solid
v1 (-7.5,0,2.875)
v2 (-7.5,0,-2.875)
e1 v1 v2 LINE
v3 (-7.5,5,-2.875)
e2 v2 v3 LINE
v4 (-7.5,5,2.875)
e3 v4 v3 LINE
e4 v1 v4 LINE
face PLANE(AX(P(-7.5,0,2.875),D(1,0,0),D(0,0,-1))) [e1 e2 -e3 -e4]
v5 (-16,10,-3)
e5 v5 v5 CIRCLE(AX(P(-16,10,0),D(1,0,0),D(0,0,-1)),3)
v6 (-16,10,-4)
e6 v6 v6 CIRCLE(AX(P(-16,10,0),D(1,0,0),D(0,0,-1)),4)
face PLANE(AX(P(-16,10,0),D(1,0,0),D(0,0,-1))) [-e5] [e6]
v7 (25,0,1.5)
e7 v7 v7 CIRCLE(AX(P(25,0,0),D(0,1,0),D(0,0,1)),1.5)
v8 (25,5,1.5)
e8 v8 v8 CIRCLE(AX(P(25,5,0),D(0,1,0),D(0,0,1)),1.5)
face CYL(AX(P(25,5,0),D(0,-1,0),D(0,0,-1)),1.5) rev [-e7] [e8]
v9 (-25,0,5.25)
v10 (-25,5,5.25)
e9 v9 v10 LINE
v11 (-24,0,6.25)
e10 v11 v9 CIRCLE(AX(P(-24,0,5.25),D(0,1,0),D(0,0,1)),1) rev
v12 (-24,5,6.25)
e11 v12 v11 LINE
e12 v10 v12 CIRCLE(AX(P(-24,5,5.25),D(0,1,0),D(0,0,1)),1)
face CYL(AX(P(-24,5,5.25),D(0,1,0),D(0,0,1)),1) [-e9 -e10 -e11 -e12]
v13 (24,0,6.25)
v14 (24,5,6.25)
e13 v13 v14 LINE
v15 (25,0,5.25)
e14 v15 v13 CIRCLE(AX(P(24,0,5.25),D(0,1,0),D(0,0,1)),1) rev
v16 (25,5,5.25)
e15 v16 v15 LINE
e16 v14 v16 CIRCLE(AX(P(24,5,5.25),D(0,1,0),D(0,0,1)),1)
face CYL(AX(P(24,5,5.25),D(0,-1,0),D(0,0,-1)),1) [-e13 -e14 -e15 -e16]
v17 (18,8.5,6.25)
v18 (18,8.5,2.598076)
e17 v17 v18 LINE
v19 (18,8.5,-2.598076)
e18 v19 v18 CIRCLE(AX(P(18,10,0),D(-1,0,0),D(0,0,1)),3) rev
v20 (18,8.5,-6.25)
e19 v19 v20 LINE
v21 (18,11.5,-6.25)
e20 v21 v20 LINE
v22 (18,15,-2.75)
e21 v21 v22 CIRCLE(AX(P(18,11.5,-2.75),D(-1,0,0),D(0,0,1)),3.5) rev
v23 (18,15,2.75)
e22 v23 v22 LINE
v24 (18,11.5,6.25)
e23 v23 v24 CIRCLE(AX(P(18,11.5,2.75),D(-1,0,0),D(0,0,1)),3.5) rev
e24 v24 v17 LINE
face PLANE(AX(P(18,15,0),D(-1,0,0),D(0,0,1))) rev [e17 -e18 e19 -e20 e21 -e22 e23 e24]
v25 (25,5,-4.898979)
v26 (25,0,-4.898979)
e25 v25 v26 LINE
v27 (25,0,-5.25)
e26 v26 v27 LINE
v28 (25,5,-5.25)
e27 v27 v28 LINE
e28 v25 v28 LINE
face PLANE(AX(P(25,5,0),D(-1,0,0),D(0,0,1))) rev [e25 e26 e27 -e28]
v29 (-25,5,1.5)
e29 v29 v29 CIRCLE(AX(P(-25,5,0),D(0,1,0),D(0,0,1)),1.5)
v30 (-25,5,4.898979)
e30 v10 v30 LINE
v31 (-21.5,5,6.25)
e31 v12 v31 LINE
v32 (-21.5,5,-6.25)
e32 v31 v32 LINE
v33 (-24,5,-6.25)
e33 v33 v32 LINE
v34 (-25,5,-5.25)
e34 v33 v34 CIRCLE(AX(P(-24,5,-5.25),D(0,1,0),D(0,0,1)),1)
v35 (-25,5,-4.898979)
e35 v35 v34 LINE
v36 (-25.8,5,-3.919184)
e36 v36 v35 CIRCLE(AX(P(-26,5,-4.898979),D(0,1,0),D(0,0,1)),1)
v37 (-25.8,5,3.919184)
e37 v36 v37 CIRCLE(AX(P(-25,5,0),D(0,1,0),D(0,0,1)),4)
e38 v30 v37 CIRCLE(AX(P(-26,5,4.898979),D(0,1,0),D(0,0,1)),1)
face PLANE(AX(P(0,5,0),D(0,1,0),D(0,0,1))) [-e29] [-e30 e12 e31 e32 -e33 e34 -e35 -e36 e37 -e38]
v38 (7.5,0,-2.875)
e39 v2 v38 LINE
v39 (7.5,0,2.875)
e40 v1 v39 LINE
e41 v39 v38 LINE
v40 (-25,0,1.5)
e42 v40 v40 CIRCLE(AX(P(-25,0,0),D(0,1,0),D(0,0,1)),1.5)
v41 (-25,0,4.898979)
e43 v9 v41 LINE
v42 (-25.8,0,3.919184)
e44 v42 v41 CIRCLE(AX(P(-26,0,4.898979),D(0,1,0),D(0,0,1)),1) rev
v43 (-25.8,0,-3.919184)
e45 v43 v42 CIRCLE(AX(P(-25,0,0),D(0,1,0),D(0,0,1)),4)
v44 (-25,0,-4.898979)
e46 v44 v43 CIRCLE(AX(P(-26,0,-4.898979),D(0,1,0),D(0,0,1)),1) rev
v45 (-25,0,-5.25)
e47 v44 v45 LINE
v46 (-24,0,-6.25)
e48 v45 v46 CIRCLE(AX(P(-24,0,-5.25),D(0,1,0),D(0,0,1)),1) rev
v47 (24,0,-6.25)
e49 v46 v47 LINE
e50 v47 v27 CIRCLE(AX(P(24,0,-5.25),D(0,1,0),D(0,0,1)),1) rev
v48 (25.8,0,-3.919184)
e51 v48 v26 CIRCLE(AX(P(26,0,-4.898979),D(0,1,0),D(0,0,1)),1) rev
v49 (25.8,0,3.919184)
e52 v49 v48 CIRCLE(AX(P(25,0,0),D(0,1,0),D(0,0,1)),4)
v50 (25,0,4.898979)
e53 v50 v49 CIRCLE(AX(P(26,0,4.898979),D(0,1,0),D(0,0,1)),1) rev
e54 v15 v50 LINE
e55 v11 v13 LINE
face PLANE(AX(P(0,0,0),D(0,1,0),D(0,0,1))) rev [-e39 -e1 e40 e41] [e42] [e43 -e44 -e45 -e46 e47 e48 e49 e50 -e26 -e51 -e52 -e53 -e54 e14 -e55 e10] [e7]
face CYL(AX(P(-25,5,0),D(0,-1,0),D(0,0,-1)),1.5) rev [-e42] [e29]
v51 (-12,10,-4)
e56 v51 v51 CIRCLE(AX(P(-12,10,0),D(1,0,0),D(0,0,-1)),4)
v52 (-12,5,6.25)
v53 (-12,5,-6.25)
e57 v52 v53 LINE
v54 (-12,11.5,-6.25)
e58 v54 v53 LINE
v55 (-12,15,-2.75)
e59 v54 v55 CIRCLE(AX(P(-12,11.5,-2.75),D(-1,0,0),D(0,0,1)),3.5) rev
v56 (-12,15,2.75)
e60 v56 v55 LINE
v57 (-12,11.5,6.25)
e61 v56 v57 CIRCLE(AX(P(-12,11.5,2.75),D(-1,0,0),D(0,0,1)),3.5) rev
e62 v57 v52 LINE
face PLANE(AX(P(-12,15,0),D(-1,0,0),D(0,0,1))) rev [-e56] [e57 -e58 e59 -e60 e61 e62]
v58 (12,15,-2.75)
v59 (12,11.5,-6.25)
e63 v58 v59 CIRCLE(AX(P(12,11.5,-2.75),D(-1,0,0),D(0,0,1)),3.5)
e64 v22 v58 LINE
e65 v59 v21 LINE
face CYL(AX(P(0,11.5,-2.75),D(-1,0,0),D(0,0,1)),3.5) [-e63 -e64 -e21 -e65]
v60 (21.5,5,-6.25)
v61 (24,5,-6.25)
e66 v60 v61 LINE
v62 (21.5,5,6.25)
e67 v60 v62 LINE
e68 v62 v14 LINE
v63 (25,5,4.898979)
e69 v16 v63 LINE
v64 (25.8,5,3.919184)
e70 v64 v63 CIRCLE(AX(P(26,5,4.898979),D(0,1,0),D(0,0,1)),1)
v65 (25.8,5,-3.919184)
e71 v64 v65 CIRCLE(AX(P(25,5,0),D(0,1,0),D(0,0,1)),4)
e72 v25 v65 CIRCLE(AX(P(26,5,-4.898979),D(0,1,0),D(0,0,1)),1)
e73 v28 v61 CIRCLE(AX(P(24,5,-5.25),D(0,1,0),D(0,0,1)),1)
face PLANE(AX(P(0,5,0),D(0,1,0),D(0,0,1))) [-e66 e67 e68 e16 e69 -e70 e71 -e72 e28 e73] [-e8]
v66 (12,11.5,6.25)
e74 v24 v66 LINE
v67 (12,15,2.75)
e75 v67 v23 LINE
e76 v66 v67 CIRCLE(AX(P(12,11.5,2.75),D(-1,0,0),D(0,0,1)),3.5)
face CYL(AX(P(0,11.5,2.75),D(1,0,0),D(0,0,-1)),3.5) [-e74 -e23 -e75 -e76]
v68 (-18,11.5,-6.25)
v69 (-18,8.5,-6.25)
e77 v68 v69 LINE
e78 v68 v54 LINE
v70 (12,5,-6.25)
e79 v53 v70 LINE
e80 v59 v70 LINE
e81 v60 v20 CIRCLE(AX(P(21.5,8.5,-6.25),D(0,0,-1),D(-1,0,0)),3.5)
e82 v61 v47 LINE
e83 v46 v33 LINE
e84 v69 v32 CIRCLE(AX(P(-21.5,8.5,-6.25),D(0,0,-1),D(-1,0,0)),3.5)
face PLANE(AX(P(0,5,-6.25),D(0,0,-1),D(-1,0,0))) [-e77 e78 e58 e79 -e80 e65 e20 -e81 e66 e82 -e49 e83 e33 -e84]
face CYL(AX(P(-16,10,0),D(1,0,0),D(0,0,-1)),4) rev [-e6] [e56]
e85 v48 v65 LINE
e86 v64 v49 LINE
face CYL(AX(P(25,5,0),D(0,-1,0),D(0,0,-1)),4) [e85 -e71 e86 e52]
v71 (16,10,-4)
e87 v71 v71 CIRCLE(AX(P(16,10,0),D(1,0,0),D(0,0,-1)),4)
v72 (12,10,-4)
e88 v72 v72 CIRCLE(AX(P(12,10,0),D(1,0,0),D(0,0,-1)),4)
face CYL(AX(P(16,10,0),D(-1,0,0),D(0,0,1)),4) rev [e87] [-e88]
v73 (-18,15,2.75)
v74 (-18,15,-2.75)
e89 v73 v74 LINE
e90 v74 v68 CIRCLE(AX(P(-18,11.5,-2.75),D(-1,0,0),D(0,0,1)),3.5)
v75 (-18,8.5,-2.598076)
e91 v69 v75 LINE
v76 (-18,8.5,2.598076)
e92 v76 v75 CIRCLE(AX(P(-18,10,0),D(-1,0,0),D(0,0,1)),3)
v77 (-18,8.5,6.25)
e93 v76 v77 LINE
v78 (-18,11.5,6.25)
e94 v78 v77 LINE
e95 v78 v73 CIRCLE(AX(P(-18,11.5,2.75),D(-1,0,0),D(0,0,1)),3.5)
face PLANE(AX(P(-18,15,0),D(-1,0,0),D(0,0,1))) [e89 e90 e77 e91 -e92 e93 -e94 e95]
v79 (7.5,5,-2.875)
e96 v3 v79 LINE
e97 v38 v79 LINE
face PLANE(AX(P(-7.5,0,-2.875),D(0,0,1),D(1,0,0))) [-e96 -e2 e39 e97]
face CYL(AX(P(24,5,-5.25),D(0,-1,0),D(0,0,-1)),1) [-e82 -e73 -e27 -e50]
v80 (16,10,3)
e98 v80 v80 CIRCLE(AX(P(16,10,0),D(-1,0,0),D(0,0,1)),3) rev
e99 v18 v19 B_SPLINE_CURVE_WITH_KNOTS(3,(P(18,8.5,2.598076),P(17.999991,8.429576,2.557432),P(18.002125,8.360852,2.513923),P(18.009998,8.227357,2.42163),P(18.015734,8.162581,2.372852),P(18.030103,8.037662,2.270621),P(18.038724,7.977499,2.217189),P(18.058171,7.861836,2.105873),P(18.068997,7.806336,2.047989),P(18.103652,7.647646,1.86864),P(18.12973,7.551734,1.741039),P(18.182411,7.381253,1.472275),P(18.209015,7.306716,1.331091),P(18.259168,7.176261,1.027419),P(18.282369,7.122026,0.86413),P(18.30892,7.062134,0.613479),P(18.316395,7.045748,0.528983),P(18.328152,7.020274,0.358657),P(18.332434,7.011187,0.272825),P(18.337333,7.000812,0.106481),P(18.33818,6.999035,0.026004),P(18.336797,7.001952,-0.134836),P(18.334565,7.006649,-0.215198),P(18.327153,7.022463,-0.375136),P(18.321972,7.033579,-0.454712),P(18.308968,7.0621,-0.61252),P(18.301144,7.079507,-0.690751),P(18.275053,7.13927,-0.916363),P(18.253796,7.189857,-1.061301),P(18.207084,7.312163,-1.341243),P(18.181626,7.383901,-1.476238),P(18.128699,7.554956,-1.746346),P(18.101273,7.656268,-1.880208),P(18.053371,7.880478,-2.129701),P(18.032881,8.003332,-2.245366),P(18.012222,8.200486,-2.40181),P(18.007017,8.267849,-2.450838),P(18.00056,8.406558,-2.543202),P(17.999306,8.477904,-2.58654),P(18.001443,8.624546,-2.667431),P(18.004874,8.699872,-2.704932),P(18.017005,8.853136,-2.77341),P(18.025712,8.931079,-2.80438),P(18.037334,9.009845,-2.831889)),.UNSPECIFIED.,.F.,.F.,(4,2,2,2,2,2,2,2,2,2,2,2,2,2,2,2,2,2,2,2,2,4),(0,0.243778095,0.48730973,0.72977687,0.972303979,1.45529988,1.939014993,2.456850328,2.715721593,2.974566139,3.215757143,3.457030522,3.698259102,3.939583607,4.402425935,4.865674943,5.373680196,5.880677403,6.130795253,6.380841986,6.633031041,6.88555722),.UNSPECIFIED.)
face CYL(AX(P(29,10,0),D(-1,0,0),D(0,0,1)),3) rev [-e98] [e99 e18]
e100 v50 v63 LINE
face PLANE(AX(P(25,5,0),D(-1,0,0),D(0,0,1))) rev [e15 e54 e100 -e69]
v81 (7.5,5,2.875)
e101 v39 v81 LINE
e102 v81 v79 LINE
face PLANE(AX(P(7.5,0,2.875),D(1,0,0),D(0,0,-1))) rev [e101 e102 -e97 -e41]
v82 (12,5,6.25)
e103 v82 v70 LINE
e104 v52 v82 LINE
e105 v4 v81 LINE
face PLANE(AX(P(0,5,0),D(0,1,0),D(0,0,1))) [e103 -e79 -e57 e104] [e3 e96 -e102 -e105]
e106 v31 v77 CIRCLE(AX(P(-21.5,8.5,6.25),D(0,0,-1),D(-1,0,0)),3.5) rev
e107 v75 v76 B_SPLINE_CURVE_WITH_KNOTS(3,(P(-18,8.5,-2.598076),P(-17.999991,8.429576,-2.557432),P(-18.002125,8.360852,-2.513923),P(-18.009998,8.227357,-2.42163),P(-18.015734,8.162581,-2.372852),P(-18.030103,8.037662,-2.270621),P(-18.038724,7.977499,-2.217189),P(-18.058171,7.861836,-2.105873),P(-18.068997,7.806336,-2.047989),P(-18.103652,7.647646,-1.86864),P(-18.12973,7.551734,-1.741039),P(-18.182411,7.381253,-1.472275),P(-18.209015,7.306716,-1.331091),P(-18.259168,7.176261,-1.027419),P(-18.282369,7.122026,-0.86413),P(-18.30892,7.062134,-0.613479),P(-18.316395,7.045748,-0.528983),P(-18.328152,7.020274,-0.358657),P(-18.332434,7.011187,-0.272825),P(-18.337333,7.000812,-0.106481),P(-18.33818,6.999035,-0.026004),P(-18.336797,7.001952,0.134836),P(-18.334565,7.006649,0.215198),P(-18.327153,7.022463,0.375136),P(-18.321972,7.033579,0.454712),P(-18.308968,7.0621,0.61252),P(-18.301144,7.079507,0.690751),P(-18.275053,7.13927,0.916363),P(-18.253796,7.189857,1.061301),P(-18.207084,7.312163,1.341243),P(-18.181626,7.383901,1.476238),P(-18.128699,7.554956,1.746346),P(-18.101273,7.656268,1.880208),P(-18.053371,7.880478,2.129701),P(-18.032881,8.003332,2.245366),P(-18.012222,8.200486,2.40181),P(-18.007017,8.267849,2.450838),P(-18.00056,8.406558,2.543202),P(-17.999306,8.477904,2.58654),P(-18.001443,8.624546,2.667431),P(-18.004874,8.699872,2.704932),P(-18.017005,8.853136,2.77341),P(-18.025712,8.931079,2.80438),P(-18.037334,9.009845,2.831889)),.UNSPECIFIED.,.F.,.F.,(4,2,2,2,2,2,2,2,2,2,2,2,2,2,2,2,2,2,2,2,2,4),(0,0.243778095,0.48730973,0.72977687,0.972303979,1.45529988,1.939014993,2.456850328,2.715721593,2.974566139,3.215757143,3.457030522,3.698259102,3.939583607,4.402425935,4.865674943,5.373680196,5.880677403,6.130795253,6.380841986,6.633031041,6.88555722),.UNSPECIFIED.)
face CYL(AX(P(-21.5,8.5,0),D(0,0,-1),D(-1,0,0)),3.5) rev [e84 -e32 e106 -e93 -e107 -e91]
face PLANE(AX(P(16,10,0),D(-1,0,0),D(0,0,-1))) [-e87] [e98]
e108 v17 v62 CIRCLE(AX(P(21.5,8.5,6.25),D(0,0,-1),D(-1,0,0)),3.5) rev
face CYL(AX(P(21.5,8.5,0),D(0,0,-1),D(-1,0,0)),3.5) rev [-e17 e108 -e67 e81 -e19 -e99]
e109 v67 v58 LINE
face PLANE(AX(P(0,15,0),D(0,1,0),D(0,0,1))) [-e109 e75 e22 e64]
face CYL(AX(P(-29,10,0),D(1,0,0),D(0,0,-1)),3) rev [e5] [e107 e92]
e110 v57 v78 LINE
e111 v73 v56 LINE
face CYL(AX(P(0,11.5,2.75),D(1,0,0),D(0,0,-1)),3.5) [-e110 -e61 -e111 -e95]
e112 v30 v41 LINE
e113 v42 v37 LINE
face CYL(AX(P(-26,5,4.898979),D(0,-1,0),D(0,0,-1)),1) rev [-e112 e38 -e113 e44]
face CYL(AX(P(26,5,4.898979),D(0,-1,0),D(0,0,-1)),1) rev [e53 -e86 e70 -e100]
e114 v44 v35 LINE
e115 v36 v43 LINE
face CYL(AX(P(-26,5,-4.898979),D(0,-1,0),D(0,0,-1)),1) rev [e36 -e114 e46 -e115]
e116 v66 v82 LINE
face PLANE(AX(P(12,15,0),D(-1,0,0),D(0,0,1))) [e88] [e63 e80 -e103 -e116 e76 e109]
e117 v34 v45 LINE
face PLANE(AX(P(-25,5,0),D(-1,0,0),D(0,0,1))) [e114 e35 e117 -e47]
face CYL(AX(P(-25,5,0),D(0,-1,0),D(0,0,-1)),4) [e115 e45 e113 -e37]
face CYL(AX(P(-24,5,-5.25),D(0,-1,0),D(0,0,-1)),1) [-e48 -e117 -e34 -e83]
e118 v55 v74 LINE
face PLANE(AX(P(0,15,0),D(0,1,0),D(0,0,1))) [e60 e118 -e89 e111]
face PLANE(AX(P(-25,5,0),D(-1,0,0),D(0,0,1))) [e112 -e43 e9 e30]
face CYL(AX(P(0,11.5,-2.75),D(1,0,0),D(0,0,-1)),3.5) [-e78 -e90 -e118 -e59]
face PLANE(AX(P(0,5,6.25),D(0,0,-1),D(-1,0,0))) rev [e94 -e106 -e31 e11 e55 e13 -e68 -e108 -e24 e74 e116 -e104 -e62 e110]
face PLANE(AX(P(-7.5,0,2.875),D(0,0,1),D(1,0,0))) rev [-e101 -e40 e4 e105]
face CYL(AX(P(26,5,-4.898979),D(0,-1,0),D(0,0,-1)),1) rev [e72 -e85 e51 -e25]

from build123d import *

# Parameters (mm, degrees)
SKETCH1_R           = 1.5
BOSS_EXTRUDE1_DEPTH = 5
BOSS_EXTRUDE2_DEPTH = 10
SKETCH3_R           = 4
CUT_EXTRUDE1_DEPTH  = 4
SKETCH3_3_R         = 3
CUT_EXTRUDE2_DEPTH  = 45.102862719
FILLET6_R           = 3.5
FILLET7_R           = 3.5
FILLET8_R           = 3.5
FILLET9_R           = 3.5
FILLET10_R          = 3.5
FILLET11_R          = 3.5
FILLET12_R          = 1
FILLET13_R          = 1
FILLET14_R          = 1
FILLET15_R          = 1
FILLET16_R          = 1
FILLET17_R          = 1
FILLET18_R          = 1
FILLET19_R          = 1
SKETCH4_W           = 15
SKETCH4_H           = 5.75
CUT_EXTRUDE3_DEPTH  = 32.305949934


with BuildPart() as part:
    # Sketch1 → Boss-Extrude1 (new body)
    with BuildSketch(Plane(origin=(0, 0, 0), x_dir=(1, 0, 0), z_dir=(0, 1, 0))):
        with BuildLine():
            Line((-25, -4), (-25, -6.25))
            Line((-25, -6.25), (25, -6.25))
            Line((25, -6.25), (25, -4))
            ThreePointArc((25, -4), (29, 0), (25, 4))
            Line((25, 4), (25, 6.25))
            Line((25, 6.25), (-25, 6.25))
            Line((-25, 6.25), (-25, 4))
            ThreePointArc((-25, 4), (-29, 0), (-25, -4))
        make_face()
        with Locations(Location((25, 0, 0), (0, 0, 270))):
            Circle(SKETCH1_R, mode=Mode.SUBTRACT)
        with Locations(Location((-25, 0, 0), (0, 0, 270))):
            Circle(SKETCH1_R, mode=Mode.SUBTRACT)
    extrude(amount=BOSS_EXTRUDE1_DEPTH)

    # Sketch2 → Boss-Extrude2 (add)
    with BuildSketch(Plane(origin=(0, 5, 0), x_dir=(1, 0, 0), z_dir=(0, 1, 0))):
        Polygon((-18, 0), (-18, -6.25), (-12, -6.25), (-12, 6.25), (-18, 6.25), align=None)
    boss_extrude2 = extrude(amount=BOSS_EXTRUDE2_DEPTH)

    # Sketch3 → Cut-Extrude1 (cut)
    with BuildSketch(Plane(origin=(-12, 0, 0), x_dir=(0, 0, -1), z_dir=(1, 0, 0))):
        with Locations((0, 10)):
            Circle(SKETCH3_R)
    cut_extrude1 = extrude(amount=-CUT_EXTRUDE1_DEPTH, mode=Mode.SUBTRACT)

    # Sketch3<3> → Cut-Extrude2 (cut, through all)
    with BuildSketch(Plane(origin=(-12, 0, 0), x_dir=(0, 0, -1), z_dir=(1, 0, 0))):
        with Locations((0, 10)):
            Circle(SKETCH3_3_R)
    cut_extrude2 = extrude(amount=-CUT_EXTRUDE2_DEPTH, mode=Mode.SUBTRACT)

    # Fillet6
    # the kernel refuses this fillet: 3.5 mm, written as the material it adds along each edge
    with BuildSketch(Plane(origin=(-18, 5, -6.25), x_dir=(0, 1, 0), z_dir=(0, 0, 1))) as fillet6_piece_1_section:
        with BuildLine():
            CenterArc((FILLET6_R, FILLET6_R), FILLET6_R, 180, 90)
            Line((0, FILLET6_R), (0, 0))
            Line((0, 0), (FILLET6_R, 0))
        make_face()
    fillet6_piece_1 = extrude(amount=12.5, mode=Mode.PRIVATE)
    fillet6_piece_1 = fillet6_piece_1 - Plane(origin=(-18.808785758, 10, 0), x_dir=(0, 0, -1), z_dir=(1, 0, 0)) * Cylinder(3, 39, mode=Mode.PRIVATE)
    add(fillet6_piece_1)

    # Fillet7
    fillet7_edges = [part.edges().sort_by_distance(p)[0] for p in [
        (-15, 15, -6.25),
    ]]
    fillet(fillet7_edges, radius=FILLET7_R)

    # Fillet8
    fillet8_edges = [part.edges().sort_by_distance(p)[0] for p in [
        (-15, 15, 6.25),
    ]]
    fillet(fillet8_edges, radius=FILLET8_R)

    # Mirror4: Boss-Extrude2, Cut-Extrude1, Cut-Extrude2 across plane
    add(boss_extrude2.mirror(Plane(origin=(0, 0, 0), x_dir=(0, 0, 1), z_dir=(1, 0, 0))))
    add(cut_extrude1.mirror(Plane(origin=(0, 0, 0), x_dir=(0, 0, 1), z_dir=(1, 0, 0))), mode=Mode.SUBTRACT)
    add(cut_extrude2.mirror(Plane(origin=(0, 0, 0), x_dir=(0, 0, 1), z_dir=(1, 0, 0))), mode=Mode.SUBTRACT)

    # Fillet9
    fillet9_edges = [part.edges().sort_by_distance(p)[0] for p in [
        (15, 15, -6.25),
    ]]
    fillet(fillet9_edges, radius=FILLET9_R)

    # Fillet10
    fillet10_edges = [part.edges().sort_by_distance(p)[0] for p in [
        (15, 15, 6.25),
    ]]
    fillet(fillet10_edges, radius=FILLET10_R)

    # Fillet11
    # the kernel refuses this fillet: 3.5 mm, written as the material it adds along each edge
    with BuildSketch(Plane(origin=(18, 5, -6.25), x_dir=(0, 1, 0), z_dir=(0, 0, 1))) as fillet11_piece_1_section:
        with BuildLine():
            CenterArc((FILLET11_R, -FILLET11_R), FILLET11_R, 90, 90)
            Line((0, -FILLET11_R), (0, 0))
            Line((0, 0), (FILLET11_R, 0))
        make_face()
    fillet11_piece_1 = extrude(amount=12.5, mode=Mode.PRIVATE)
    fillet11_piece_1 = fillet11_piece_1 - Plane(origin=(18.808785758, 10, 0), x_dir=(0, 0, -1), z_dir=(-1, 0, 0)) * Cylinder(3, 39, mode=Mode.PRIVATE)
    add(fillet11_piece_1)

    # Fillet12
    fillet12_edges = [part.edges().sort_by_distance(p)[0] for p in [
        (25, 2.5, -6.25),
    ]]
    fillet(fillet12_edges, radius=FILLET12_R)

    # Fillet13
    fillet13_edges = [part.edges().sort_by_distance(p)[0] for p in [
        (25, 2.5, 6.25),
    ]]
    fillet(fillet13_edges, radius=FILLET13_R)

    # Fillet14
    fillet14_edges = [part.edges().sort_by_distance(p)[0] for p in [
        (-25, 2.5, 6.25),
    ]]
    fillet(fillet14_edges, radius=FILLET14_R)

    # Fillet15
    fillet15_edges = [part.edges().sort_by_distance(p)[0] for p in [
        (-25, 2.5, -6.25),
    ]]
    fillet(fillet15_edges, radius=FILLET15_R)

    # Fillet16
    fillet16_edges = [part.edges().sort_by_distance(p)[0] for p in [
        (-25, 2.5, -4),
    ]]
    fillet(fillet16_edges, radius=FILLET16_R)

    # Fillet17
    fillet17_edges = [part.edges().sort_by_distance(p)[0] for p in [
        (-25, 2.5, 4),
    ]]
    fillet(fillet17_edges, radius=FILLET17_R)

    # Fillet18
    fillet18_edges = [part.edges().sort_by_distance(p)[0] for p in [
        (25, 2.5, 4),
    ]]
    fillet(fillet18_edges, radius=FILLET18_R)

    # Fillet19
    fillet19_edges = [part.edges().sort_by_distance(p)[0] for p in [
        (25, 2.5, -4),
    ]]
    fillet(fillet19_edges, radius=FILLET19_R)

    # Sketch4 → Cut-Extrude3 (cut, through all)
    with BuildSketch(Plane(origin=(0, 5, 0), x_dir=(1, 0, 0), z_dir=(0, 1, 0))):
        Rectangle(SKETCH4_W, SKETCH4_H)
    extrude(amount=-CUT_EXTRUDE3_DEPTH, mode=Mode.SUBTRACT)


solid = part.part
